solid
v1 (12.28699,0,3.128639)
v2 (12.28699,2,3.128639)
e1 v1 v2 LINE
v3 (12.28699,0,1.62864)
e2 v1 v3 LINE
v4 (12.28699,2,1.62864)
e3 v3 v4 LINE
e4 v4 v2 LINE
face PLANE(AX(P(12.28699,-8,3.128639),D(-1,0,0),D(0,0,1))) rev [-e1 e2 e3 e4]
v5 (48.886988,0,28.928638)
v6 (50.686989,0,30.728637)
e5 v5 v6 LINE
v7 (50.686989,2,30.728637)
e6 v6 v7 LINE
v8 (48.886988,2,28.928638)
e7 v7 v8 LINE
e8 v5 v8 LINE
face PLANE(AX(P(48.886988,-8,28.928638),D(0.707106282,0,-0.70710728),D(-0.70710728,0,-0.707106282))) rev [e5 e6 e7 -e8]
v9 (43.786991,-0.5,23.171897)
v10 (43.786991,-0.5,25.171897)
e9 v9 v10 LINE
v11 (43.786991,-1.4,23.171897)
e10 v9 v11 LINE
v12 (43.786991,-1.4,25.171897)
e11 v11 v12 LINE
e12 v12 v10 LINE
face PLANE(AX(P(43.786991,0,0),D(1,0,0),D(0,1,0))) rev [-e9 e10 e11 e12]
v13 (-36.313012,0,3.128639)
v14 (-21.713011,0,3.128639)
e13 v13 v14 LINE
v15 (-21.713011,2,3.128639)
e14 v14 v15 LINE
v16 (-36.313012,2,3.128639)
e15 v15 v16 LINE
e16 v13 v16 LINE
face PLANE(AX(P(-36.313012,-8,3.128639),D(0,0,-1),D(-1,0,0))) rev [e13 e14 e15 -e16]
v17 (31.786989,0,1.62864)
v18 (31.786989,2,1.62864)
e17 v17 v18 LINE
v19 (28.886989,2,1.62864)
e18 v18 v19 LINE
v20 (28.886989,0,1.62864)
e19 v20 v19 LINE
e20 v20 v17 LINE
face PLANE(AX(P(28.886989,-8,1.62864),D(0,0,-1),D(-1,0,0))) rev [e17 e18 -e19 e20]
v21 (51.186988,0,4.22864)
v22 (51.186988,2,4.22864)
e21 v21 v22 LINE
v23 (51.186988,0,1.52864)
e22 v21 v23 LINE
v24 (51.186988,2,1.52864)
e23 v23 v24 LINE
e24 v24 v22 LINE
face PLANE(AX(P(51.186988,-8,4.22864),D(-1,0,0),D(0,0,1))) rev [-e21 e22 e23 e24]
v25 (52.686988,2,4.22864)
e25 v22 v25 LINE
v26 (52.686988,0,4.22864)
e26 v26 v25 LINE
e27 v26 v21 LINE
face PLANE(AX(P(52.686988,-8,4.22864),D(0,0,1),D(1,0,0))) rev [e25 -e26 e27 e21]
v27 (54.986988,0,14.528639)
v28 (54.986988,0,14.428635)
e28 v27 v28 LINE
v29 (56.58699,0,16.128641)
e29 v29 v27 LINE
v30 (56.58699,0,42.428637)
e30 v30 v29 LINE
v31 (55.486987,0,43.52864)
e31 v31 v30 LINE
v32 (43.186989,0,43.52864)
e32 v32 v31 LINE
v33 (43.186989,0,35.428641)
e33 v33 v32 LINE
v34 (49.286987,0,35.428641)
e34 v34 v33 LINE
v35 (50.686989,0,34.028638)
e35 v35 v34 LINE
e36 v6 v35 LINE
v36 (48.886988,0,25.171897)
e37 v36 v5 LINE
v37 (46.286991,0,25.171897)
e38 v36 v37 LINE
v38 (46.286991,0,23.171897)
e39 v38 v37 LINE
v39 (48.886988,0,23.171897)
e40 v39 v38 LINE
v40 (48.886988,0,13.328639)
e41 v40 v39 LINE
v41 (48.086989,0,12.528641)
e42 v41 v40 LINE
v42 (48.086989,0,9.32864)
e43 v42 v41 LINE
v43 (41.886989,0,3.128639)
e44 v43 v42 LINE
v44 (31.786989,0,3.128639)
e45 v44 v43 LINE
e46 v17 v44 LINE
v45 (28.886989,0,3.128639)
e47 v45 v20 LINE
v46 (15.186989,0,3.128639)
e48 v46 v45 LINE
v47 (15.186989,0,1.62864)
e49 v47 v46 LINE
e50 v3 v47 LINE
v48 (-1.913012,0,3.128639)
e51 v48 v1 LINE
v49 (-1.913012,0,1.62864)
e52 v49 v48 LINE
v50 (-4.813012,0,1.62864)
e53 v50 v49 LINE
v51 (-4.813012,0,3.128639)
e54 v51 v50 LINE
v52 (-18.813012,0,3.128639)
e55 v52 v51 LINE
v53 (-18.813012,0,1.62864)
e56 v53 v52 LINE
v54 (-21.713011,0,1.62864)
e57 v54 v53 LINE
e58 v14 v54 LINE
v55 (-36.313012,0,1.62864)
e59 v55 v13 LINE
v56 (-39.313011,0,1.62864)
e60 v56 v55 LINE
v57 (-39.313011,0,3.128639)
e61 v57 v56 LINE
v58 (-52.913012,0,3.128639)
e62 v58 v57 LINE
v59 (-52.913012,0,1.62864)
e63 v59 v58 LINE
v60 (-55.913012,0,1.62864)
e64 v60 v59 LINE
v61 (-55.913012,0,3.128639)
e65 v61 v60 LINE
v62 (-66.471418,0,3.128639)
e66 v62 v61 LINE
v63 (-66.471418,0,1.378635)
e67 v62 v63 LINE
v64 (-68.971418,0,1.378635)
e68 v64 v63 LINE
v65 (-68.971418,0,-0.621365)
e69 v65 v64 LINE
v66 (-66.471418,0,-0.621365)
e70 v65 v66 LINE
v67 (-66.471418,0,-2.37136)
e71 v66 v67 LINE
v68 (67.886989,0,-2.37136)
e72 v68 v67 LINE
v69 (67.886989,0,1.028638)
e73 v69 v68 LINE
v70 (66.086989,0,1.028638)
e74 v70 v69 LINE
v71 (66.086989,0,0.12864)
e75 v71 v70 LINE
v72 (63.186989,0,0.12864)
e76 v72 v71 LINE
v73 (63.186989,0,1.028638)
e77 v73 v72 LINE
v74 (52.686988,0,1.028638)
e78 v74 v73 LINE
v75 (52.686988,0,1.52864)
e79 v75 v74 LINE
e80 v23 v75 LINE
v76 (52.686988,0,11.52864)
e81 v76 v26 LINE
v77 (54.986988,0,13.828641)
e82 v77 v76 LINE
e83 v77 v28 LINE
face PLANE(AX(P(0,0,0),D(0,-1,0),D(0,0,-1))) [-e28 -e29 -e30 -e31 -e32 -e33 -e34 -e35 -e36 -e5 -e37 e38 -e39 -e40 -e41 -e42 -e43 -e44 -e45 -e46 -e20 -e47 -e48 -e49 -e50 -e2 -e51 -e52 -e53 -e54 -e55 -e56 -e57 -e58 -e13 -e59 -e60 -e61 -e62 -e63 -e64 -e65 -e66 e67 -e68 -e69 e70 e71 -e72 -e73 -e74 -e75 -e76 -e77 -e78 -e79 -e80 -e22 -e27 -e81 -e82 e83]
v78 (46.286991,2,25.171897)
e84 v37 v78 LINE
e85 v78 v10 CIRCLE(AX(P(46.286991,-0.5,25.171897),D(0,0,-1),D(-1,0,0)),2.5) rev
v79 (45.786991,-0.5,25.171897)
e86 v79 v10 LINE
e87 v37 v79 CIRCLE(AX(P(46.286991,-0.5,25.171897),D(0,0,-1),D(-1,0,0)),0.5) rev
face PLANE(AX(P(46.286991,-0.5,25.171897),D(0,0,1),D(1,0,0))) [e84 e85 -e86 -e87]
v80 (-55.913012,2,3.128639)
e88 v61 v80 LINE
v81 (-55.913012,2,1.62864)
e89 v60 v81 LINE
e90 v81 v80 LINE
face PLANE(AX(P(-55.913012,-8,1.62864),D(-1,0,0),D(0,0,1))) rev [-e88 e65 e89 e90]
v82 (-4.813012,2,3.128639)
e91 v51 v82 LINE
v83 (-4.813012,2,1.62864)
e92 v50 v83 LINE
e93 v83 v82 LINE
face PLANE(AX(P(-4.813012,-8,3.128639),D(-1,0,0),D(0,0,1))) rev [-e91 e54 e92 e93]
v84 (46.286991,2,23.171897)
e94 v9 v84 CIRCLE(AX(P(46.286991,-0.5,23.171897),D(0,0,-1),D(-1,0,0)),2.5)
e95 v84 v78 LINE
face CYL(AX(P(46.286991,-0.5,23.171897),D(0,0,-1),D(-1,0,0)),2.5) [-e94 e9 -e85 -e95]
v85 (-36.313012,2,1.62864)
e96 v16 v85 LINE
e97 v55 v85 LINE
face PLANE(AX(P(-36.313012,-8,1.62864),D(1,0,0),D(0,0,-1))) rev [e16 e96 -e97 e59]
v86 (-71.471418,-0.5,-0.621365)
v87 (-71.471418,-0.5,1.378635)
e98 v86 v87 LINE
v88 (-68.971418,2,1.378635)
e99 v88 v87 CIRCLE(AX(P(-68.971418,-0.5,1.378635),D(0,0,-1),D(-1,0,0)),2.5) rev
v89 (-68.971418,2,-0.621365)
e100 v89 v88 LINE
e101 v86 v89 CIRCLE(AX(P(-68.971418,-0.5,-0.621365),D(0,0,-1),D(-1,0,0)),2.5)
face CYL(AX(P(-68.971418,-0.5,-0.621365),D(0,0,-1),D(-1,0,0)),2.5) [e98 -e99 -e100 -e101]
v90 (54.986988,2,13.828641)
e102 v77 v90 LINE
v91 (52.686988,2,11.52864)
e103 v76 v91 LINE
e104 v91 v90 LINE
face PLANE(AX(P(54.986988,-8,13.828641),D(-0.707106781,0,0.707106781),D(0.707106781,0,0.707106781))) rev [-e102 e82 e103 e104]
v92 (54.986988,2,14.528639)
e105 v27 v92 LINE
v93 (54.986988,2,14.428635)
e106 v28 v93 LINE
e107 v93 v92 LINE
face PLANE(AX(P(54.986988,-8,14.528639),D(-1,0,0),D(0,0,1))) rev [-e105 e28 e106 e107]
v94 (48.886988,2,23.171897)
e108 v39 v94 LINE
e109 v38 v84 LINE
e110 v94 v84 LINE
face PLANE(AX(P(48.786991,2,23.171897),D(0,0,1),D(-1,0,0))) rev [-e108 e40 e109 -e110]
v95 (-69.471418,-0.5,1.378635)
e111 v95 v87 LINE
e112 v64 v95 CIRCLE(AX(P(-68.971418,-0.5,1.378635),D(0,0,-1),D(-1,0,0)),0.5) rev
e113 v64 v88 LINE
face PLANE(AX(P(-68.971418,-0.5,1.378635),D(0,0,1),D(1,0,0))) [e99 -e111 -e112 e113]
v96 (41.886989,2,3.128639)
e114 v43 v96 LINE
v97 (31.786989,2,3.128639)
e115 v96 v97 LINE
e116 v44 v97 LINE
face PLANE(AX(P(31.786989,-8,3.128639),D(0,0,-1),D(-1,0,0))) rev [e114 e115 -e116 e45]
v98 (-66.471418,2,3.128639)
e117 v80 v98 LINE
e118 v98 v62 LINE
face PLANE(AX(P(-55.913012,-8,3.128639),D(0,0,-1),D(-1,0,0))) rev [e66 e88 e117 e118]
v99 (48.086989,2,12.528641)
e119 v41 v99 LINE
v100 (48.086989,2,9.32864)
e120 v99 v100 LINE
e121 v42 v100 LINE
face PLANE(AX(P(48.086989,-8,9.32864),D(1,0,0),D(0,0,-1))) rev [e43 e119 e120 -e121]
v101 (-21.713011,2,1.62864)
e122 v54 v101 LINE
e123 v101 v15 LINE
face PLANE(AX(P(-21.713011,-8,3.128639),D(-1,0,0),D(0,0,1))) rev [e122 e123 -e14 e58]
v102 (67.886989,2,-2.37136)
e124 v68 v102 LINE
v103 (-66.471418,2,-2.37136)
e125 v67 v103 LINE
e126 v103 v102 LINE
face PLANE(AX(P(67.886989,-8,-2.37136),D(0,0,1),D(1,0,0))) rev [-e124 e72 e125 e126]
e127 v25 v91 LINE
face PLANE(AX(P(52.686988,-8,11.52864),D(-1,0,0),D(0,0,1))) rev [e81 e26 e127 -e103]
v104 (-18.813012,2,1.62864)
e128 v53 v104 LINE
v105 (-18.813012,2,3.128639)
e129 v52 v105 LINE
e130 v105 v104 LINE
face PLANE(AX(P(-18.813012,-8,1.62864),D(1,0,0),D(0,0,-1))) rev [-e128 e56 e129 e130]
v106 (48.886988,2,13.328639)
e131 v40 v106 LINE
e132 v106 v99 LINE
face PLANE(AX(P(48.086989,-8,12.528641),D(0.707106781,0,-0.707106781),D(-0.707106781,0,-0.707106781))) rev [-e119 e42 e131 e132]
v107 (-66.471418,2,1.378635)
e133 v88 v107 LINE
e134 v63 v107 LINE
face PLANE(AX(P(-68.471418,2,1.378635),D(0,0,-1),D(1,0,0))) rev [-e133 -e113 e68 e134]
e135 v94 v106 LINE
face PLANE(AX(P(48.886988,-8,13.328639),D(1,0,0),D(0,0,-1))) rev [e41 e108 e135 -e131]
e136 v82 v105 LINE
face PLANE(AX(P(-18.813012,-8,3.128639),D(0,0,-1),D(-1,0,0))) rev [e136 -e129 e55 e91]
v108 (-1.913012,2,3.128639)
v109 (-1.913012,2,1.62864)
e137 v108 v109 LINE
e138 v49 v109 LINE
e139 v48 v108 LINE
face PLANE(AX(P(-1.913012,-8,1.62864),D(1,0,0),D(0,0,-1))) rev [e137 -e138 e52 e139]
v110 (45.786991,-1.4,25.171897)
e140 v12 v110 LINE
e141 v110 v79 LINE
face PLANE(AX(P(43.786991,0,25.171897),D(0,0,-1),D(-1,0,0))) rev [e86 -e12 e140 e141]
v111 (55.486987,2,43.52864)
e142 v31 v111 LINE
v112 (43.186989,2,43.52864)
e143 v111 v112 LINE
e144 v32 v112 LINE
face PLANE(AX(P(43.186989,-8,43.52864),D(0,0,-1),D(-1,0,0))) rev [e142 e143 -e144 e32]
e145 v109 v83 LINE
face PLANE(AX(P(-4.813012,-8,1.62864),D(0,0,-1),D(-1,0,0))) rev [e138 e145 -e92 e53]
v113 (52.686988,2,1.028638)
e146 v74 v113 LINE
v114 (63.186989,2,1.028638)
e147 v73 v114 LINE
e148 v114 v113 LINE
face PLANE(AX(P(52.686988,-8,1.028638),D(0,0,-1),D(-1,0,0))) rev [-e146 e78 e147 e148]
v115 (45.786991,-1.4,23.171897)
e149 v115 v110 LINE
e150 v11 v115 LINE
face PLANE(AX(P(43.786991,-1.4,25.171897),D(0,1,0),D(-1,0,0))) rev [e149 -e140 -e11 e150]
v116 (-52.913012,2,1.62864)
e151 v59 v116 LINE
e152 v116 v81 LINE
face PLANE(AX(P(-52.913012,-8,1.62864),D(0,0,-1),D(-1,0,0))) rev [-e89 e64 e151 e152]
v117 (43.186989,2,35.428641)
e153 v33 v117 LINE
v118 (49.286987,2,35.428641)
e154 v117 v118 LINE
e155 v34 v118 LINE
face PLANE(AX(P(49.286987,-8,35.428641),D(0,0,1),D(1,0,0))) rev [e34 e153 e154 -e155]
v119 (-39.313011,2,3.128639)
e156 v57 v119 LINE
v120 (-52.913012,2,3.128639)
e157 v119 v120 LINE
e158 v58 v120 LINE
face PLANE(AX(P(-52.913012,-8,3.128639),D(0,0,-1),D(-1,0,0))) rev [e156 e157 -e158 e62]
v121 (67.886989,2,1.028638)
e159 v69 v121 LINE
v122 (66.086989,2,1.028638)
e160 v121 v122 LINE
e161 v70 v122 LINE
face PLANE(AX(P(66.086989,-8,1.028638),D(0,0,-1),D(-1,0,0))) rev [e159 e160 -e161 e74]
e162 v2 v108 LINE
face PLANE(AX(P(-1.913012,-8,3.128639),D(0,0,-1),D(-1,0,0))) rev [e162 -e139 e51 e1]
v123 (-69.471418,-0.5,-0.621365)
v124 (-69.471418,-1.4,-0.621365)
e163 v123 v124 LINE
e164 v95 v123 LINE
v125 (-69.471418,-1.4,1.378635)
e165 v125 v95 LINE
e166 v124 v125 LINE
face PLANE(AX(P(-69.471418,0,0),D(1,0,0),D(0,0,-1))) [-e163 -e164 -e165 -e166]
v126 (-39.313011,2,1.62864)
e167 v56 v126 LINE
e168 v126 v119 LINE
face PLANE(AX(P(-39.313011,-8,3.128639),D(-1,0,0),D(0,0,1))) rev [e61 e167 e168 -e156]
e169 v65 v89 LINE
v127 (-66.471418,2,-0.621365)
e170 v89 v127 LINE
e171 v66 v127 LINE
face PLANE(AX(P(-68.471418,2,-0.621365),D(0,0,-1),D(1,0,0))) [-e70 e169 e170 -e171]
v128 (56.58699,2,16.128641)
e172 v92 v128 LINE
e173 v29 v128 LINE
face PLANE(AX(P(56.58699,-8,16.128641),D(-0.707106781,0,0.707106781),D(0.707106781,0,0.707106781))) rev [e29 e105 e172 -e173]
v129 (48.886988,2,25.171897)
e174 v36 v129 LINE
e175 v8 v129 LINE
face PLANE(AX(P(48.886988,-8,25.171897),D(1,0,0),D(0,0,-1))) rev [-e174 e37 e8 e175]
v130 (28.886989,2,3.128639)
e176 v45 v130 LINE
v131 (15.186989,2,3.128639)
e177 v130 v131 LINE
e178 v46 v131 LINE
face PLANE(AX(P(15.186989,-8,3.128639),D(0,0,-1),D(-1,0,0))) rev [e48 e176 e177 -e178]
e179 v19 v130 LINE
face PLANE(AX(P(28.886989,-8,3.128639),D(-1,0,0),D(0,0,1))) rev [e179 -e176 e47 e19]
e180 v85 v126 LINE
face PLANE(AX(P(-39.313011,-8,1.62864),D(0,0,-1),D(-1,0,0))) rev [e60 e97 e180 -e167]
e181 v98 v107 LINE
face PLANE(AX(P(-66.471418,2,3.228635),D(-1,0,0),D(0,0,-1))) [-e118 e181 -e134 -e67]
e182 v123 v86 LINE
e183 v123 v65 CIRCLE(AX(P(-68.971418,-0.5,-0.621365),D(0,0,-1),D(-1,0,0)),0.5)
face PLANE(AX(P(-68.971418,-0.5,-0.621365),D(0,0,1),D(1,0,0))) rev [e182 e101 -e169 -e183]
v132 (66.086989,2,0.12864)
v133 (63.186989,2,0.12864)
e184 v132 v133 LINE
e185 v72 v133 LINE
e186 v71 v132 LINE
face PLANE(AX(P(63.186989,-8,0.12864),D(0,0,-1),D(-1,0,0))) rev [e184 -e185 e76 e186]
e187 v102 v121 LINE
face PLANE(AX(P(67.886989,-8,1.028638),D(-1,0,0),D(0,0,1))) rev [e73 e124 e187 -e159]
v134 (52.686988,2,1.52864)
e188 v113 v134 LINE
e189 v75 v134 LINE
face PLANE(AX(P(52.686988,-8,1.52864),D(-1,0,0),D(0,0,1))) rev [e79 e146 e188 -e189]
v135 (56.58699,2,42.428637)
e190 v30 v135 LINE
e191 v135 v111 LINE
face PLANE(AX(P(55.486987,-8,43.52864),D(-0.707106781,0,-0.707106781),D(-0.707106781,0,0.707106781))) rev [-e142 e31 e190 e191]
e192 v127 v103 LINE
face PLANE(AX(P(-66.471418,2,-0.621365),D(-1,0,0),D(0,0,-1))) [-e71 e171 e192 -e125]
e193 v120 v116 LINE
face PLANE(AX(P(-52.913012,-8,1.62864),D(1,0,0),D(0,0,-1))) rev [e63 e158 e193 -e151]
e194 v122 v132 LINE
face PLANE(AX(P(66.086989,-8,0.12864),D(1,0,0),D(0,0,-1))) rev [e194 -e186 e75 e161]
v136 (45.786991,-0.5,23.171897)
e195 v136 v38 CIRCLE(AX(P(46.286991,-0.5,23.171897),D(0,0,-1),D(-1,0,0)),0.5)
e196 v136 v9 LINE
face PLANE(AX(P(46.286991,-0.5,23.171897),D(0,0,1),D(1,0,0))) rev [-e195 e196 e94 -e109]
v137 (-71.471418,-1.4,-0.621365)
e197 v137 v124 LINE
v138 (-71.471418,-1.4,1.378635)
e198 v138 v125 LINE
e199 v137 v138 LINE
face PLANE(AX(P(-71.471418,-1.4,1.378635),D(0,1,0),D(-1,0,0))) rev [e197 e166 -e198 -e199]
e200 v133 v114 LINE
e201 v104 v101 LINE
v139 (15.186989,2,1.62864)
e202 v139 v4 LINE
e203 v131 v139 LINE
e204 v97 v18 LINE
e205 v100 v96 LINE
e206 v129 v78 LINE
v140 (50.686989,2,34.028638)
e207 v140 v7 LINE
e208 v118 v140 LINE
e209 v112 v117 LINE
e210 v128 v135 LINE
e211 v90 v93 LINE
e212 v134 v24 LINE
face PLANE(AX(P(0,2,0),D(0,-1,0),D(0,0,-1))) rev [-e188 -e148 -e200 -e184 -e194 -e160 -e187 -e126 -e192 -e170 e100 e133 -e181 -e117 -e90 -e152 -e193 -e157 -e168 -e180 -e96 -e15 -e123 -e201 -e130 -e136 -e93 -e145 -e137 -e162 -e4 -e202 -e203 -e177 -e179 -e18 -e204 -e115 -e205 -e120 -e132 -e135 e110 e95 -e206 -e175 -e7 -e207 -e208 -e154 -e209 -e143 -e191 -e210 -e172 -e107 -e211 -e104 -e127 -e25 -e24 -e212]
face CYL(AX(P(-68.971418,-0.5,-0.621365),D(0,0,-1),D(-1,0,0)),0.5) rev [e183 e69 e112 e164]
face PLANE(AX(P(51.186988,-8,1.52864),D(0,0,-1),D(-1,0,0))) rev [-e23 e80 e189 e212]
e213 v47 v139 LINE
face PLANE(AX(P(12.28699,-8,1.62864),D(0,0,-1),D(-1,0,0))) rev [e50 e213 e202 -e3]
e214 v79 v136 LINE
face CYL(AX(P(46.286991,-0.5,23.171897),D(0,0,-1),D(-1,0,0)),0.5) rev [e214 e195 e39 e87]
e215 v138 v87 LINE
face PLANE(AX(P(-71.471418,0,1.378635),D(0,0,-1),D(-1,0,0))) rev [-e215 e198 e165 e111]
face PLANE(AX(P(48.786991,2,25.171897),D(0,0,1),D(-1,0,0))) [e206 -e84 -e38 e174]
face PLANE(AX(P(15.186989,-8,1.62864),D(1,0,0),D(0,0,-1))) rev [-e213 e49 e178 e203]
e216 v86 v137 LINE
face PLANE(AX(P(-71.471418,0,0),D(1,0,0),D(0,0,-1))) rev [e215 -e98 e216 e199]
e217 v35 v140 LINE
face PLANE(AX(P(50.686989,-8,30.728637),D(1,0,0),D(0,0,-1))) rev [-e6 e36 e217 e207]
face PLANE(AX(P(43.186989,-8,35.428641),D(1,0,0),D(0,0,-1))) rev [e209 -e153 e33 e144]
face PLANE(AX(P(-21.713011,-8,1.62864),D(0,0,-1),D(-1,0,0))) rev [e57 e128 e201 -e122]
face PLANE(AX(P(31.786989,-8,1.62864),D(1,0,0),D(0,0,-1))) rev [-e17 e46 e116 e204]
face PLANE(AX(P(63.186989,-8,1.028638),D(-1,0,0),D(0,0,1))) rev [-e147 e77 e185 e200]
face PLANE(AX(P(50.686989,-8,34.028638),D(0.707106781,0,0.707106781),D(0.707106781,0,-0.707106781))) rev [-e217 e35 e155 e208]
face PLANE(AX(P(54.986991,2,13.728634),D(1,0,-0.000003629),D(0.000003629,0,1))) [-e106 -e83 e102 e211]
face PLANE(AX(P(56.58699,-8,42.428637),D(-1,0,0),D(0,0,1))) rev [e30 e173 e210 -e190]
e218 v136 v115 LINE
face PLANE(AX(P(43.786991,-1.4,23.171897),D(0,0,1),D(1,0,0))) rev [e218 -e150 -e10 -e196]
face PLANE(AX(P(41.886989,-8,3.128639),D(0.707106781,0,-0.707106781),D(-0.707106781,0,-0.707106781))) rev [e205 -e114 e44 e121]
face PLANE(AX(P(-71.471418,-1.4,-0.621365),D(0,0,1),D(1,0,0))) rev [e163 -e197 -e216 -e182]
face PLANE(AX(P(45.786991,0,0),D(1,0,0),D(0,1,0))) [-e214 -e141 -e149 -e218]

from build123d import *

# Parameters (mm, degrees)
BOSS_EXTRUDE1_DEPTH     = 2
EDGE_FLANGE1_DEPTH      = 2
EDGE_FLANGE1_BEND_DEPTH = 2
MOVE_FACE1_BY           = 5
CUT_EXTRUDE1_DEPTH      = 10


# Sheet-metal steps are written as plain solids
with BuildPart() as part:
    # Sketch1 → Boss-Extrude1 (new body)
    with BuildSketch(Plane(origin=(0, 0, 0), x_dir=(1, 0, 0), z_dir=(0, 1, 0))):
        Polygon((48.786990623, -23.171897133), (48.786990623, -13.328634875), (47.986992223, -12.528636475), (47.986992223, -9.428635055), (41.786991923, -3.228634755), (-54.913007717, -3.228634755), (-66.471417942, -3.228634755), (-66.471417942, -1.378635375), (-68.471417942, -1.378635375), (-68.471417942, 0.621364625), (-66.471417942, 0.621364625), (-66.471417942, 2.471364005), (-54.913007717, 2.471364005), (65.786992183, 2.471364005), (65.786992183, -1.128636415), (52.786992783, -1.128636415), (52.786992783, -11.528635935), (54.986990923, -13.728634075), (54.986993463, -14.428635215), (56.686992603, -16.128634355), (56.686992603, -42.528634895), (53.786993323, -45.428634175), (43.086991863, -45.428634175), (43.086991863, -34.028634115), (49.286992163, -34.028634115), (50.586992103, -32.728634175), (50.586992103, -30.828635435), (48.786990623, -29.028636495), (48.786990623, -25.171897133), (46.786990623, -25.171897133), (46.786990623, -23.171897133), align=None)
    extrude(amount=BOSS_EXTRUDE1_DEPTH)

    # Edge-Flange1 section (across the edge) → Edge-Flange1 (add)
    with BuildSketch(Plane(origin=(-69.471417942, 0, 1.378635375), x_dir=(1, 0, 0), z_dir=(0, 0, -1))):
        with BuildLine():
            Line((-2, 0.5), (-2, 1.4))
            Line((-2, 1.4), (0, 1.4))
            Line((0, 1.4), (0, 0.5))
            ThreePointArc((0, 0.5), (0.146446609, 0.146446609), (0.5, 0))
            Line((0.5, 0), (1, 0))
            Line((1, 0), (1, -2))
            Line((1, -2), (0.5, -2))
            ThreePointArc((0.5, -2), (-1.267766953, -1.267766953), (-2, 0.5))
        make_face()
    extrude(amount=EDGE_FLANGE1_DEPTH)

    # Edge-Flange1 section 2 (across the edge) → Edge-Flange1 bend (add)
    with BuildSketch(Plane(origin=(45.786990623, 0, 25.171897133), x_dir=(1, 0, 0), z_dir=(0, 0, -1))):
        with BuildLine():
            Line((-2, 0.5), (-2, 1.4))
            Line((-2, 1.4), (0, 1.4))
            Line((0, 1.4), (0, 0.5))
            ThreePointArc((0, 0.5), (0.146446609, 0.146446609), (0.5, 0))
            Line((0.5, 0), (1, 0))
            Line((1, 0), (1, -2))
            Line((1, -2), (0.5, -2))
            ThreePointArc((0.5, -2), (-1.267766953, -1.267766953), (-2, 0.5))
        make_face()
    extrude(amount=EDGE_FLANGE1_BEND_DEPTH)

    # Move Face1: a face moved outward by 5.0
    extrude(part.faces().sort_by_distance((65.786992183, 1, -0.671363795))[0], amount=MOVE_FACE1_BY, dir=(1, 0, 0))

    # Sketch12 → Cut-Extrude1 (cut)
    with BuildSketch(Plane(origin=(0, 2, 0), x_dir=(1, 0, 0), z_dir=(0, 1, 0))):
        Polygon((-52.913012042, -1.628639718), (-55.913012042, -1.628639718), (-55.913012042, -3.128639258), (-67.564249917, -3.128639258), (-67.671952829, -4.327104706), (41.886988858, -5.326407077), (48.086989158, -13.828640718), (48.007739716, -22.517187069), (46.286990623, -23.171897133), (48.886987558, -23.171897133), (48.886987558, -13.328639178), (48.086989158, -12.528640778), (48.086989158, -9.328639558), (41.886988858, -3.128639258), (31.786988738, -3.128639258), (31.786988738, -1.628639718), (28.886989458, -1.628639718), (28.886989458, -3.128639258), (15.186988918, -3.128639258), (15.186988918, -1.628639718), (12.286989638, -1.628639718), (12.286989638, -3.128639258), (-1.913012442, -3.128639258), (-1.913012442, -1.628639718), (-4.813011722, -1.628639718), (-4.813011722, -3.128639258), (-18.813011662, -3.128639258), (-18.813011662, -1.628639718), (-21.713010942, -1.628639718), (-21.713010942, -3.128639258), (-36.313012222, -3.128639258), (-36.313012222, -1.628639718), (-39.313011302, -1.628639718), (-39.313011302, -3.128639258), (-52.913012042, -3.128639258), align=None)
        Polygon((48.886987558, -25.171897133), (46.286990623, -25.171897133), (41.570815933, -34.028638418), (41.570815933, -47.167587605), (56.254650903, -46.954291818), (57.278434149, -42.02008581), (58.126913923, -16.761088184), (54.30540669, -8.580570975), (54.30540669, -2.3223377), (71.613193797, -2.589733287), (71.946410025, 3.760976012), (44.354427072, 3.760976012), (-68.474759816, 3.760976012), (-68.386329283, 2.371359902), (67.886988718, 2.371359902), (67.886988718, -1.028638378), (66.086988718, -1.028638378), (66.086988718, -0.128640178), (63.186989438, -0.128640178), (63.186989438, -1.028638378), (52.686987578, -1.028638378), (52.686987578, -1.528639918), (51.186988038, -1.528639918), (51.186988038, -4.228639598), (52.686987578, -4.228639598), (52.686987578, -11.528640238), (54.986988058, -13.828640718), (54.986988058, -14.528639318), (56.586989938, -16.128641198), (56.586989938, -42.428636858), (55.486987058, -43.528639738), (43.186988798, -43.528639738), (43.186988798, -35.428640698), (49.286986758, -35.428640698), (50.686989038, -34.028638418), (50.686989038, -30.728637398), (48.886987558, -28.928638458), align=None)
    extrude(amount=-CUT_EXTRUDE1_DEPTH, mode=Mode.SUBTRACT)


solid = part.part
